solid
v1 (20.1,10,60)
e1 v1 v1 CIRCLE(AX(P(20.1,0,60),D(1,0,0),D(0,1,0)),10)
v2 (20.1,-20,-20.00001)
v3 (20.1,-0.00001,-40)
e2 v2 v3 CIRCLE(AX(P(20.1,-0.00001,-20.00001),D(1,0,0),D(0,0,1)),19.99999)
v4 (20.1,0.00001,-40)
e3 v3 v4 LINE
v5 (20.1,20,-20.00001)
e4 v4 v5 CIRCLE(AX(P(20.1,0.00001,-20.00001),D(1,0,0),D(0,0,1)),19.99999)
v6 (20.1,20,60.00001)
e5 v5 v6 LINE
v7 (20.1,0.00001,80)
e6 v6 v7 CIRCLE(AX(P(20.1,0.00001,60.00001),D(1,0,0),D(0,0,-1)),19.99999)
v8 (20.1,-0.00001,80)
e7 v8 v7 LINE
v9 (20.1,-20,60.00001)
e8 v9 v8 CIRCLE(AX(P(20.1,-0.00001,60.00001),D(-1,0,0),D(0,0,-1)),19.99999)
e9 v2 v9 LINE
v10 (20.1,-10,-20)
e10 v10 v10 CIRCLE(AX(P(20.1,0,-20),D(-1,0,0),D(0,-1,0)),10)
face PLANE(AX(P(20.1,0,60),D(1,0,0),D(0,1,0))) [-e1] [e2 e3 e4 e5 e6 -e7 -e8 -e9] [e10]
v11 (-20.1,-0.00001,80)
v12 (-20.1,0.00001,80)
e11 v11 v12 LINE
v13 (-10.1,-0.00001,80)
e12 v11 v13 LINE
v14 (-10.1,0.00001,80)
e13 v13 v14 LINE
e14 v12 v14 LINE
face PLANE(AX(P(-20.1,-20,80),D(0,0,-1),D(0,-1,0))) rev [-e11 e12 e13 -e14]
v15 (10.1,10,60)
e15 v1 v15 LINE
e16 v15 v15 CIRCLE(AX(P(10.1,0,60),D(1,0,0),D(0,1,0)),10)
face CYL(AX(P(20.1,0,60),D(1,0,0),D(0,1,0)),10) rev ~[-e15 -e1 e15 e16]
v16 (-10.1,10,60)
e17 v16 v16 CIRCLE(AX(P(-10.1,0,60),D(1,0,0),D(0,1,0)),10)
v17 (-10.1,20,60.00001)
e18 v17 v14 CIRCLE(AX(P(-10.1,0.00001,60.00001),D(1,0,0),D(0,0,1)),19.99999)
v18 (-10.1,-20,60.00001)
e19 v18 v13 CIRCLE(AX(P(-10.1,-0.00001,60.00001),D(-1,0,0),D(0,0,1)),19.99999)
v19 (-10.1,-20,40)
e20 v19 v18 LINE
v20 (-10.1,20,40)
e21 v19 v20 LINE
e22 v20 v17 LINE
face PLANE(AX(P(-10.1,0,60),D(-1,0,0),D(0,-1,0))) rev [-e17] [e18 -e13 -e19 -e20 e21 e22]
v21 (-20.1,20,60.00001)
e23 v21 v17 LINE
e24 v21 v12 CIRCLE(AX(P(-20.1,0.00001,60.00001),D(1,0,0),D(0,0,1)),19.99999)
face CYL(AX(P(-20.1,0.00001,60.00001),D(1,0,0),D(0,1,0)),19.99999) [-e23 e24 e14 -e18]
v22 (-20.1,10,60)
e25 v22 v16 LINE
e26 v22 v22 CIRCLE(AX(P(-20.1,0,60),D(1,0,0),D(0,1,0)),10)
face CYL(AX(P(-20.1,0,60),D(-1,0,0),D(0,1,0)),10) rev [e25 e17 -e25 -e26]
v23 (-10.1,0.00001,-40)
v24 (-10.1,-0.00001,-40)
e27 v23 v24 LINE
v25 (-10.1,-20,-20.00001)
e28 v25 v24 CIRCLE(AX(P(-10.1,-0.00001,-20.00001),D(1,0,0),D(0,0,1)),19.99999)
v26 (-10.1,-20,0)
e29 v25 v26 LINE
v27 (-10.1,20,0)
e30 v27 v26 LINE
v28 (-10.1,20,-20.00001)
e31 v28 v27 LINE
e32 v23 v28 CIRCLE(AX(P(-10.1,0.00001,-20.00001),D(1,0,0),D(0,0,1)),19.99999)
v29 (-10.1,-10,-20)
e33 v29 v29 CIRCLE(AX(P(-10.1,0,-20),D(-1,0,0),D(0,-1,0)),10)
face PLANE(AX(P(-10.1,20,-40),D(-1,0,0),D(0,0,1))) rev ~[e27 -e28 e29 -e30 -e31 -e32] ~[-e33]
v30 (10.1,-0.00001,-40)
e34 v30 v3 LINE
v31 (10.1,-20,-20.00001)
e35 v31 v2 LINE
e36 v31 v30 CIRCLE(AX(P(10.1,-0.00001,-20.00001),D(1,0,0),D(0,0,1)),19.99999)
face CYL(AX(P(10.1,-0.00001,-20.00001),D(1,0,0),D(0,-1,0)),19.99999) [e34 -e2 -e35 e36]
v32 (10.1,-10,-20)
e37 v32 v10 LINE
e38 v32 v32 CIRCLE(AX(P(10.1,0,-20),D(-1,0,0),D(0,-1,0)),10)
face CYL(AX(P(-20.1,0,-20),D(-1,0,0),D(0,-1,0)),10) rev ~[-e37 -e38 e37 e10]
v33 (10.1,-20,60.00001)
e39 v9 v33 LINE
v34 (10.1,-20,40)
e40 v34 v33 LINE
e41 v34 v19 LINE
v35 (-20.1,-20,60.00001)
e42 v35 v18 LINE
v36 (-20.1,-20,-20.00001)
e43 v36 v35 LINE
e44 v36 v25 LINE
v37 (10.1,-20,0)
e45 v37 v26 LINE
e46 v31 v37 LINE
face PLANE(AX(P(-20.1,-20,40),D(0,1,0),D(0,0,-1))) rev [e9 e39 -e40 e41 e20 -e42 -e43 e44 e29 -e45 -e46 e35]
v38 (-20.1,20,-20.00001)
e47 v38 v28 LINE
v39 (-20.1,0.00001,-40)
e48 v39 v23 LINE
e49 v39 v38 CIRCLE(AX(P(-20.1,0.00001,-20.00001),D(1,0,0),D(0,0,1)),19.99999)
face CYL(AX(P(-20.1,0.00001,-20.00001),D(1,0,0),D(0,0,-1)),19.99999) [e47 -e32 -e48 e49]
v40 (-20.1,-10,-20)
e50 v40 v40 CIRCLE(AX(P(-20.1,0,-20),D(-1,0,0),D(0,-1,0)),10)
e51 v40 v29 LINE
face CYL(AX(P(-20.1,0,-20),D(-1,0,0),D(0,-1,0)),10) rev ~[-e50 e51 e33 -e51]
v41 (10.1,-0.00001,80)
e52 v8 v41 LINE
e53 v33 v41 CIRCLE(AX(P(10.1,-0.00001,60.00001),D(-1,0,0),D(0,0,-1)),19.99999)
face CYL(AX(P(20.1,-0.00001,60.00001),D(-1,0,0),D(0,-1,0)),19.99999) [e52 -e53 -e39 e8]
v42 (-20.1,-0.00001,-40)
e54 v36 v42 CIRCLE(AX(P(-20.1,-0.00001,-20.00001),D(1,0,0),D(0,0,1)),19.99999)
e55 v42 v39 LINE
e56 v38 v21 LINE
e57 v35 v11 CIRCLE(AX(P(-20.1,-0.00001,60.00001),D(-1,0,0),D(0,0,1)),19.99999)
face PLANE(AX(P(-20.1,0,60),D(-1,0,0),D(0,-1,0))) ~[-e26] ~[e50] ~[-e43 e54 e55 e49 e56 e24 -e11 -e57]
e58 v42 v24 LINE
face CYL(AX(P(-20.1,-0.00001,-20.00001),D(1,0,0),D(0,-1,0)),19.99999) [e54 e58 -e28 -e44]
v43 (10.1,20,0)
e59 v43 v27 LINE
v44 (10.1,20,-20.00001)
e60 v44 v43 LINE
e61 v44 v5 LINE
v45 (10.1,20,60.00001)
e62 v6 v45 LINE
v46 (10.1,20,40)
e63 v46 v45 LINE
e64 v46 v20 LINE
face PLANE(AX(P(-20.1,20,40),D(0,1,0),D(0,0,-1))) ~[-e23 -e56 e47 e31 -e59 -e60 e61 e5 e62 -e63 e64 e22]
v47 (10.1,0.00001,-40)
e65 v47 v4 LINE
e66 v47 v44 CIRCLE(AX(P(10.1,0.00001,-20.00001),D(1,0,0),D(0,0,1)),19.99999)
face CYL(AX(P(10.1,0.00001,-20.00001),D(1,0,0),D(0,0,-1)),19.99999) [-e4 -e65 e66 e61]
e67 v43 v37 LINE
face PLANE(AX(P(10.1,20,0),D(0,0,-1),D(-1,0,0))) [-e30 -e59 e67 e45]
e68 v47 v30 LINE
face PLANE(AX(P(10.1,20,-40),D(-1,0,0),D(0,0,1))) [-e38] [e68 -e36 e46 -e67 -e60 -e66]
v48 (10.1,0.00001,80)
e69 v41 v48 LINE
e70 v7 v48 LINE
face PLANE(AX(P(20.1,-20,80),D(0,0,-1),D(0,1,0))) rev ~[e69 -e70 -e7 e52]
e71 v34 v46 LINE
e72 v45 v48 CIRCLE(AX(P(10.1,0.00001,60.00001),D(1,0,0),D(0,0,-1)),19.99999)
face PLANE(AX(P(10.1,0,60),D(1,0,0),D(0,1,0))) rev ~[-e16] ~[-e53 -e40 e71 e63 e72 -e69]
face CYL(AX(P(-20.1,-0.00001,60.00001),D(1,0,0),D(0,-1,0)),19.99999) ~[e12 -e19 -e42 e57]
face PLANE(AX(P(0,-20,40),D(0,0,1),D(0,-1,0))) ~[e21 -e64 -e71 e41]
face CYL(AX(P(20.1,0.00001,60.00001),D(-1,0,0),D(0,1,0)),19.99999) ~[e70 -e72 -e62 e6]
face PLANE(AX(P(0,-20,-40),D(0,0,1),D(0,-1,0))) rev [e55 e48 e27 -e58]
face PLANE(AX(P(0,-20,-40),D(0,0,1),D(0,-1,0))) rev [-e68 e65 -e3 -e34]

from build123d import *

# Parameters (mm, degrees)
F0_W      = 40
F0_H      = 80
F1_DEPTH  = 20.1
F2_W      = 40
F2_H      = 40
F3_DEPTH  = 10
F4_R      = 10
F5_DEPTH  = 10.1
F7_R      = 19.99999
F8_R      = 10
F9_DEPTH  = 80
F10_W     = 20.2
F10_H     = 40
F11_DEPTH = 40
F12_R     = 19.99999


# Not quite as in the source:
# - a fillet or chamfer is up to 0.001 mm smaller than in the source, because OpenCascade refuses the exact size


with BuildPart() as f1:
    # F0 (on Right) → F1 (new body)
    with BuildSketch(Plane.YZ):
        Rectangle(F0_W, F0_H)
    extrude(amount=F1_DEPTH)

    # F2 (on face) → F3 (join)
    with BuildSketch(Plane.YZ.offset(20.1)):
        with Locations((0, 60)):
            Rectangle(F2_W, F2_H)
    extrude(amount=-F3_DEPTH)

    # F4 (on face) → F5 (cut)
    with BuildSketch(Plane.YZ.offset(20.1)):
        with Locations((0, 60)):
            Circle(F4_R)
    extrude(amount=-F5_DEPTH, mode=Mode.SUBTRACT)

    # F6: F1 across face


with BuildPart() as f1_1:
    add(f1.part)
    add(f1.part.mirror(Plane(origin=(0, 0, 0), x_dir=(0, 1, 0), z_dir=(-1, 0, 0))))

    # F7 (radius 20 in the source; OpenCascade refuses exactly that, so slightly less here)
    f7_edges = [f1_1.edges().sort_by_distance(p)[0] for p in [
        (15.1, 20, 80),
        (15.1, -20, 80),
        (-15.1, 20, 80),
        (-15.1, -20, 80),
    ]]
    fillet(f7_edges, radius=F7_R)

    # F8 (on face) → F9 (cut)
    with BuildSketch(Plane(origin=(-20.1, 0, 0), x_dir=(0, -1, 0), z_dir=(-1, 0, 0))):
        with Locations((0, -20)):
            Circle(F8_R)
    extrude(amount=-F9_DEPTH, mode=Mode.SUBTRACT)

    # F10 (on face) → F11 (cut, through all)
    with BuildSketch(Plane(origin=(0, 20, 0), x_dir=(-1, 0, 0), z_dir=(0, 1, 0))):
        with Locations((0, -20)):
            Rectangle(F10_W, F10_H)
    extrude(amount=-F11_DEPTH, mode=Mode.SUBTRACT)

    # F12 (radius 20 in the source; OpenCascade refuses exactly that, so slightly less here)
    f12_edges = [f1_1.edges().sort_by_distance(p)[0] for p in [
        (-15.1, 20, -40),
        (-15.1, -20, -40),
        (15.1, 20, -40),
        (15.1, -20, -40),
    ]]
    fillet(f12_edges, radius=F12_R)


solid = f1_1.part
